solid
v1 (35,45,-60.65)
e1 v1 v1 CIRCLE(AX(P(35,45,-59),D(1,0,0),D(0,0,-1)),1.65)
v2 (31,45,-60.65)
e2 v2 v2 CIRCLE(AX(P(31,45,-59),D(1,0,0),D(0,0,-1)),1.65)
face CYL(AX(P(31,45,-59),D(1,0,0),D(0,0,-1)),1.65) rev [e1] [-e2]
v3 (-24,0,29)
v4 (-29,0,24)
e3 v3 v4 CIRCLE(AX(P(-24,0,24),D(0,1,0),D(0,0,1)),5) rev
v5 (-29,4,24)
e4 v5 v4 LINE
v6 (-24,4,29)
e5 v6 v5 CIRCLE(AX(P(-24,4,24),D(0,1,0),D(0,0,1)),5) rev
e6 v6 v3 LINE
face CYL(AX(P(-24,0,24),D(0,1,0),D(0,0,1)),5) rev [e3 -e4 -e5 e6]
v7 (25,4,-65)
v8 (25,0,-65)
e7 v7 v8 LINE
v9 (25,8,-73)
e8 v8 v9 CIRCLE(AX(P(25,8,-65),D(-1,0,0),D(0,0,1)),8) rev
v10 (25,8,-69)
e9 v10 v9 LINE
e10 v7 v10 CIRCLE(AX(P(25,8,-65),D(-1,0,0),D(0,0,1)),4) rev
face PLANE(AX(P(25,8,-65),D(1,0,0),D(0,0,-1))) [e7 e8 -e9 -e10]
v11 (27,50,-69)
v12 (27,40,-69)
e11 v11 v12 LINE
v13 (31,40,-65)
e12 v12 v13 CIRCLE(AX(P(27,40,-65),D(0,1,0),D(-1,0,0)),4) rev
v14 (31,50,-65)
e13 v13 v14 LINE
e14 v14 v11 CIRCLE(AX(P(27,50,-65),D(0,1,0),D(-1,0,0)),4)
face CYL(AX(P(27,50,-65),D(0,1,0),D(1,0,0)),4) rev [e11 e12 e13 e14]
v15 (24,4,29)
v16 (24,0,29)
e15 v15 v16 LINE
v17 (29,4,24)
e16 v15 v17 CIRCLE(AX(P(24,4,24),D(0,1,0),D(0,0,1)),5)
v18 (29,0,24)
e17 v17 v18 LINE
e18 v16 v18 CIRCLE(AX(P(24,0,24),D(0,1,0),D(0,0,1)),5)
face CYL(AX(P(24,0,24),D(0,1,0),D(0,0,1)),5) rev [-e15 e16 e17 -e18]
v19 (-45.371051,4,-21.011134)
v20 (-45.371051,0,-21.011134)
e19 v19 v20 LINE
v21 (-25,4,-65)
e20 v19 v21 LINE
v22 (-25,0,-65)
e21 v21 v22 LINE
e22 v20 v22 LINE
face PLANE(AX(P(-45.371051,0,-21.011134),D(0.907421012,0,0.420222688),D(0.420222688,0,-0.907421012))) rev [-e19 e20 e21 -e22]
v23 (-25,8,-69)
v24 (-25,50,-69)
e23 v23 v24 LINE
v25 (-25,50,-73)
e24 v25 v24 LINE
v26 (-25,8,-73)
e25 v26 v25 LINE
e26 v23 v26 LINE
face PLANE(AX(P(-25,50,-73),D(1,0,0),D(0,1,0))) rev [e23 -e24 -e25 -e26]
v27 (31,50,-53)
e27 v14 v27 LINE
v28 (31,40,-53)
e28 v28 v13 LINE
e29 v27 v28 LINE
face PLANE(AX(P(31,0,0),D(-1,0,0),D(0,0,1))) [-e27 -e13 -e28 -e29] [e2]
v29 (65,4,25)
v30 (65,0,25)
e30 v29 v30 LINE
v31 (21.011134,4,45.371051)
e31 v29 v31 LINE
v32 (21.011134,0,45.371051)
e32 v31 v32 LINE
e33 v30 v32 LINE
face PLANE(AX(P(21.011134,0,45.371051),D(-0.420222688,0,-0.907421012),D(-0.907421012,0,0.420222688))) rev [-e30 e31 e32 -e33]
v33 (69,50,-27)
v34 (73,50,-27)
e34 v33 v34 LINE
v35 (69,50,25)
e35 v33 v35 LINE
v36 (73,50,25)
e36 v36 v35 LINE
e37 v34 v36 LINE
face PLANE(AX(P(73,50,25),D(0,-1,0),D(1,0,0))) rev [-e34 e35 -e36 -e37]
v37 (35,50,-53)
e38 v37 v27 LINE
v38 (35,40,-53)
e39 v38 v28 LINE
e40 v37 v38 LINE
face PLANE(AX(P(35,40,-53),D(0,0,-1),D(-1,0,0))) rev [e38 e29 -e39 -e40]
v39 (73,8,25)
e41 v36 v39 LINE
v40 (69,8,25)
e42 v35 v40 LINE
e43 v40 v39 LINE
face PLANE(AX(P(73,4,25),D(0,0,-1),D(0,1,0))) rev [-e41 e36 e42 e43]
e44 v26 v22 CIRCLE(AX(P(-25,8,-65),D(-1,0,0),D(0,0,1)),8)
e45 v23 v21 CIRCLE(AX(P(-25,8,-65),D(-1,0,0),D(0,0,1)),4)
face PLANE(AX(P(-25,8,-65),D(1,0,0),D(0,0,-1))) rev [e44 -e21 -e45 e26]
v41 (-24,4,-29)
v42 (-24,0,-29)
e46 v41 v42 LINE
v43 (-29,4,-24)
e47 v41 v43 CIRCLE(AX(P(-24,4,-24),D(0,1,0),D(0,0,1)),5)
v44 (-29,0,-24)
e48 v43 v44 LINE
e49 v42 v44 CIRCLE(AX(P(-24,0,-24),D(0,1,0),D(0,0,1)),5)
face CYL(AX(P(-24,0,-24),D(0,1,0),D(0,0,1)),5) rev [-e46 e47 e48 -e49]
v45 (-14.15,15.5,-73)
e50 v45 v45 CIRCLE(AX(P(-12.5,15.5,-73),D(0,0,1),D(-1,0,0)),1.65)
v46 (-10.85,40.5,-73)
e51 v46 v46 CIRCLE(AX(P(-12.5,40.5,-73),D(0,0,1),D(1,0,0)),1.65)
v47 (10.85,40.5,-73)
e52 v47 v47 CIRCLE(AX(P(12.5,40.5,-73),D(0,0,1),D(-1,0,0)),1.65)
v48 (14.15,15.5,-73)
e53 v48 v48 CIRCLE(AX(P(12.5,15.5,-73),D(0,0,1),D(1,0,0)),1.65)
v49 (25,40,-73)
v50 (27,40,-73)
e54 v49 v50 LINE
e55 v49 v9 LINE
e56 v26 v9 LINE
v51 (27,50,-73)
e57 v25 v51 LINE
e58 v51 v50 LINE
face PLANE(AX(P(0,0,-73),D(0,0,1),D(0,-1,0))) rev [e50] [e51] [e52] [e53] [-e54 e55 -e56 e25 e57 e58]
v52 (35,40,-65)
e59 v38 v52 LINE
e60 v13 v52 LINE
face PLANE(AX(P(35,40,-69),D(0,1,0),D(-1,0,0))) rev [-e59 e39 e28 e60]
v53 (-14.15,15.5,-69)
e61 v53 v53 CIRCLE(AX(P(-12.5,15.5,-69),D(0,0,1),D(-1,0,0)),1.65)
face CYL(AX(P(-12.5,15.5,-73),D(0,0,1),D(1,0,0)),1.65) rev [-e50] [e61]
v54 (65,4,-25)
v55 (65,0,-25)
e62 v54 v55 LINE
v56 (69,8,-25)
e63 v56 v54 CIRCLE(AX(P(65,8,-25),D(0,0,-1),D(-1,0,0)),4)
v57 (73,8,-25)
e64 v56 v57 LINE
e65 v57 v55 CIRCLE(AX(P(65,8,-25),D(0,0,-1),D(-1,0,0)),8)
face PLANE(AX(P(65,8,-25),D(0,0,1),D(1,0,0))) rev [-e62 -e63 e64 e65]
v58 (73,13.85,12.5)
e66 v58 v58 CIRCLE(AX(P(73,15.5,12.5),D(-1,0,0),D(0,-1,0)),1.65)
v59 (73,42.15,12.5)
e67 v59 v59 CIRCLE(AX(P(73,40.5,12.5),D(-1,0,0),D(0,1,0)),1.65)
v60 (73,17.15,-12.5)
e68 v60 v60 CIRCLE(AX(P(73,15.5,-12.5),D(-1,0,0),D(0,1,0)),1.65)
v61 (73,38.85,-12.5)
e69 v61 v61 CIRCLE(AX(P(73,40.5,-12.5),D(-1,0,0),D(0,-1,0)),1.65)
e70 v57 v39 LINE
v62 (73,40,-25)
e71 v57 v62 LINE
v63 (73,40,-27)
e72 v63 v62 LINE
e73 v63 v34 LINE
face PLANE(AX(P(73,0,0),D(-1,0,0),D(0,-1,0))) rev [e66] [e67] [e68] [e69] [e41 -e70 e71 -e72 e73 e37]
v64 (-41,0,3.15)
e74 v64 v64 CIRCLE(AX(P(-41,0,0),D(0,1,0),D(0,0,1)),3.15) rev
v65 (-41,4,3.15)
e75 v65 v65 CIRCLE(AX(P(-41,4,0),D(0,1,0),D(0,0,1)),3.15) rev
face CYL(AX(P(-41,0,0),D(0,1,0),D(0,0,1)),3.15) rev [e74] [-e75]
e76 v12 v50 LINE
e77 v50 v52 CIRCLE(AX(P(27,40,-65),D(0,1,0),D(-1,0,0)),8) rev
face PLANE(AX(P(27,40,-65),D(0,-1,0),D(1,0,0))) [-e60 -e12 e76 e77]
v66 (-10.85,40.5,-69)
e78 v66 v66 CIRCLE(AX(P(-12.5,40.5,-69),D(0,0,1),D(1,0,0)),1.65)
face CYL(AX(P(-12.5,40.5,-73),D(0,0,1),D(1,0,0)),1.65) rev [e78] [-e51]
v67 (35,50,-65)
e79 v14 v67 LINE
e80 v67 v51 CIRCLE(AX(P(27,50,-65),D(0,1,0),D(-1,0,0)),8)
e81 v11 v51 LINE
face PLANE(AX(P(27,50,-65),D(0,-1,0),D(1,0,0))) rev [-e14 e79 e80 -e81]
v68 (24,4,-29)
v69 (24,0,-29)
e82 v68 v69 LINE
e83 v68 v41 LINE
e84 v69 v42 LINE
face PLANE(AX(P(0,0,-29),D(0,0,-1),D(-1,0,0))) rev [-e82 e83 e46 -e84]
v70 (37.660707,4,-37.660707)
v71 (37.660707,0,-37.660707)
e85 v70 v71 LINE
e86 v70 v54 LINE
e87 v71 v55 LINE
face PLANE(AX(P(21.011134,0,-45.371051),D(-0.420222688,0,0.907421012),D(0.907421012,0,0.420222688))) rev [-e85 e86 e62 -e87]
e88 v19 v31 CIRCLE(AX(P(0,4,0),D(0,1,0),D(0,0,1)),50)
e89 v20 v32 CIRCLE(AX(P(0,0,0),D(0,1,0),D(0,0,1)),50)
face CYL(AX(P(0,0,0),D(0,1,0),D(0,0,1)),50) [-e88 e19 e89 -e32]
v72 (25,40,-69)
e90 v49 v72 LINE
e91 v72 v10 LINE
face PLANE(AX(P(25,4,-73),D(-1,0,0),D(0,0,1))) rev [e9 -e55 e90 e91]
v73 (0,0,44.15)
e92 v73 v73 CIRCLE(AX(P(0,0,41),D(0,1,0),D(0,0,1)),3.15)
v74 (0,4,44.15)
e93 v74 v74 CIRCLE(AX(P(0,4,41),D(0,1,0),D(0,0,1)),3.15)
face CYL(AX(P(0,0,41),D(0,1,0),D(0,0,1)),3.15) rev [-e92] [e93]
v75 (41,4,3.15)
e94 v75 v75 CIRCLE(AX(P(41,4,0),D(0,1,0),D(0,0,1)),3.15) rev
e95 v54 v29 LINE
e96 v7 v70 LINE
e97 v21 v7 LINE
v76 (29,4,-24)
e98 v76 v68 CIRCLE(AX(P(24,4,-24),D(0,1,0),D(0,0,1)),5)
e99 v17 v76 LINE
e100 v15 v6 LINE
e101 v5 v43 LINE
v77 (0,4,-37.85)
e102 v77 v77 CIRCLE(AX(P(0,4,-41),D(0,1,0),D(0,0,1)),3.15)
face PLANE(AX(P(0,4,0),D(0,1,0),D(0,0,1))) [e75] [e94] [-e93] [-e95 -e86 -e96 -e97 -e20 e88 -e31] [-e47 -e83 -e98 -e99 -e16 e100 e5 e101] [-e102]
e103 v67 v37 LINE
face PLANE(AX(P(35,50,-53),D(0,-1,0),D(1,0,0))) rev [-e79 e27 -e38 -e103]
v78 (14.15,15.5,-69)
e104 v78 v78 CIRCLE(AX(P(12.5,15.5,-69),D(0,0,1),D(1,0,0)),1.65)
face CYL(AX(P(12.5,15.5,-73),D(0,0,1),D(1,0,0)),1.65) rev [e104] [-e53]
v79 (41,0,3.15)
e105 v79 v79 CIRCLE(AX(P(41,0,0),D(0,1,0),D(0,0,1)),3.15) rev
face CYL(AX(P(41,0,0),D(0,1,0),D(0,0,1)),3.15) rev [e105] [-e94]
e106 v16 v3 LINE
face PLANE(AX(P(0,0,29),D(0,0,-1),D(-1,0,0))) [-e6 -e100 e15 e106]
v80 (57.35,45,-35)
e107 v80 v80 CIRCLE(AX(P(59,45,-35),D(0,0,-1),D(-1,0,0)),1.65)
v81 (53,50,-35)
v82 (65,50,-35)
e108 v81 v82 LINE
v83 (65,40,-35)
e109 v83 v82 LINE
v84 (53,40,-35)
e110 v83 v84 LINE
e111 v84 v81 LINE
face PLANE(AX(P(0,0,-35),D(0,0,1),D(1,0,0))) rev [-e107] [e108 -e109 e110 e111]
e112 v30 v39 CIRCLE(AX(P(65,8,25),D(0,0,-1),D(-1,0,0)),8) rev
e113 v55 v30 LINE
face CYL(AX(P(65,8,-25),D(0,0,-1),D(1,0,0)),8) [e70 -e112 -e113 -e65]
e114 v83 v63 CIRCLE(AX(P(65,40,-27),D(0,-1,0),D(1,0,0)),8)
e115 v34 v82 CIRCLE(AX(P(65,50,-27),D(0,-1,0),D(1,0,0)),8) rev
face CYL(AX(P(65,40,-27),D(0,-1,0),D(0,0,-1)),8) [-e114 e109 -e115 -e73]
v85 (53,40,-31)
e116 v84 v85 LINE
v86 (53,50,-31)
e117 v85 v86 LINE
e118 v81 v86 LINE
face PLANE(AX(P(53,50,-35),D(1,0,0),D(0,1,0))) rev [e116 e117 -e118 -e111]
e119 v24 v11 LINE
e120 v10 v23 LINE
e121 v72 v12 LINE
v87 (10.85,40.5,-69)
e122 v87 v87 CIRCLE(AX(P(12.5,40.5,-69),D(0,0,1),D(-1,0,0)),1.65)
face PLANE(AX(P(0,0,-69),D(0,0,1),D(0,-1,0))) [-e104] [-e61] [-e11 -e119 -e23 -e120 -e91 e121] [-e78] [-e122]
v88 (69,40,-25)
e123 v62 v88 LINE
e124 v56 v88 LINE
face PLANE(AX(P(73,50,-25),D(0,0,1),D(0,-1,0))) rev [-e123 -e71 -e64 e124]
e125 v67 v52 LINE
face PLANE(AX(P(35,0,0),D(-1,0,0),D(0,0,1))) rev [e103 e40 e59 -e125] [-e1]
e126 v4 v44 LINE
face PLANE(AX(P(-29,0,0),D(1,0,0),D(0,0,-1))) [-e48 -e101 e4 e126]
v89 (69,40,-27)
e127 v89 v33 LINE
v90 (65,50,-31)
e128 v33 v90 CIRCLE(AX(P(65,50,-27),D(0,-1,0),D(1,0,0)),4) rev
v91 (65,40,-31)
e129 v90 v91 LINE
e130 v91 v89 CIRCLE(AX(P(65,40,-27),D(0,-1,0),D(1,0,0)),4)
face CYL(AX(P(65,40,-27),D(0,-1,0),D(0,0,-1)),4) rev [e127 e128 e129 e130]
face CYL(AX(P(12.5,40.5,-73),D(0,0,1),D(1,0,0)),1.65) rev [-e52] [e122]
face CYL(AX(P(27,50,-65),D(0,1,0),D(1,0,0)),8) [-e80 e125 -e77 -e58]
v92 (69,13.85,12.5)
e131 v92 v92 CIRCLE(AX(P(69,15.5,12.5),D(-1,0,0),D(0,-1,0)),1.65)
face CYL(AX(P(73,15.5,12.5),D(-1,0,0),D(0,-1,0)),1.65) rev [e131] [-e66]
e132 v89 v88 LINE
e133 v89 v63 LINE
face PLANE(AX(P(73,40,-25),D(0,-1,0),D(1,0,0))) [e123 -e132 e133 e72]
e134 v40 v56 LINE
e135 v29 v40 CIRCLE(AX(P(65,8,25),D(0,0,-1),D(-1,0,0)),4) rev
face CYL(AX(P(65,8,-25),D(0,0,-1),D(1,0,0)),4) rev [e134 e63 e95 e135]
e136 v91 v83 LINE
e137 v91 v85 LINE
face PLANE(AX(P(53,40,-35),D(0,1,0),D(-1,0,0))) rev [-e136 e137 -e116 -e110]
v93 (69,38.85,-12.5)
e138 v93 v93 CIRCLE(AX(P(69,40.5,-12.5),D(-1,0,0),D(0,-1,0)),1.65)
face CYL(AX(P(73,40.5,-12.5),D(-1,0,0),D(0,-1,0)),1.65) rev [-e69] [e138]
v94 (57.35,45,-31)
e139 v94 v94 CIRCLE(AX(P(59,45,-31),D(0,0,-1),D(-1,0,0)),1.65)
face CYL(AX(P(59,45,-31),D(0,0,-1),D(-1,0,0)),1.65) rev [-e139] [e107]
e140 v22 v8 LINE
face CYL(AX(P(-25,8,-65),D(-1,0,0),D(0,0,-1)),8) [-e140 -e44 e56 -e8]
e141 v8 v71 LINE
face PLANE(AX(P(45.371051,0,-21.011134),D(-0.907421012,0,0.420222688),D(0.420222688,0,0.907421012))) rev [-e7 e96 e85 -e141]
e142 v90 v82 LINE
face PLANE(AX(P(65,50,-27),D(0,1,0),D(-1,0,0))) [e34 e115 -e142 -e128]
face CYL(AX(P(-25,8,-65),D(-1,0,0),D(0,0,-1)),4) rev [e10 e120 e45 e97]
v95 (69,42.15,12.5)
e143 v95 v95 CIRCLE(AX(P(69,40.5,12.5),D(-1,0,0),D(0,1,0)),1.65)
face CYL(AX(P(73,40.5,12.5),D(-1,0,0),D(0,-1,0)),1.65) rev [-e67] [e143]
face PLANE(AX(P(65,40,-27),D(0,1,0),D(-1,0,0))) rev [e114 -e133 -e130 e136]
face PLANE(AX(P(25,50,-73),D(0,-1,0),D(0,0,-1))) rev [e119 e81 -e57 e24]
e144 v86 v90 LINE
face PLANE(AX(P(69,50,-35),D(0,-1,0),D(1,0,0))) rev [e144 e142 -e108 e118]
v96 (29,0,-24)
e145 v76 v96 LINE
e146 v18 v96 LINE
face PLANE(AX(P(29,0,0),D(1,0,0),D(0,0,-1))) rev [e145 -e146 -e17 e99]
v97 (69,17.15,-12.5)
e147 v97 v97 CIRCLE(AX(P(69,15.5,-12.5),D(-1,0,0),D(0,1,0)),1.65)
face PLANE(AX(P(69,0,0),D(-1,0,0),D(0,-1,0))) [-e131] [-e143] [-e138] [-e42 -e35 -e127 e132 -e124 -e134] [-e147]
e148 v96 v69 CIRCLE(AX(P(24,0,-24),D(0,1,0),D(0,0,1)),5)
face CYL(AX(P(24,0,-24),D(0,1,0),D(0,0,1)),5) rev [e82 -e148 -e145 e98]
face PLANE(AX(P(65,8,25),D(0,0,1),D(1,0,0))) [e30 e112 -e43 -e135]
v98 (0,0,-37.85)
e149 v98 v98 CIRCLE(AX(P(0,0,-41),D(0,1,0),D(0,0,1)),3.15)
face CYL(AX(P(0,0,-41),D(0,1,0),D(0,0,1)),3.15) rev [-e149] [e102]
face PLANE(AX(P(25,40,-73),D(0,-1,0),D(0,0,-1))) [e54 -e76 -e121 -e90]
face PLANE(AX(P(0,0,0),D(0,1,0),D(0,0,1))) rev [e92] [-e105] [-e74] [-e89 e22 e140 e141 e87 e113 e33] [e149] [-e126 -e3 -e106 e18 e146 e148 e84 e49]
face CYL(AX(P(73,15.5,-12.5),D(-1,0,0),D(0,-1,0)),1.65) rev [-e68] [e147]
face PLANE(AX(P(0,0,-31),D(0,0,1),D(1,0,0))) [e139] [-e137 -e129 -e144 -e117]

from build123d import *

# Parameters (mm, degrees)
SKETCH_1_R                         = 3.15
EXTRUDE_1_DEPTH                    = 4
SM_EDGE_FLANGE_1_DEPTH             = 50
SM_EDGE_FLANGE_1_BEND_DEPTH        = 50
SKETCH_25_W                        = 10
SKETCH_25_H                        = 10
EXTRUDE_3_DEPTH                    = 4
SKETCH_23_W                        = 10
SKETCH_23_H                        = 10
EXTRUDE_2_DEPTH                    = 4
SKETCH_21_R                        = 1.65
CUT_EXTRUDE_1_DEPTH                = 149.290255917
SKETCH_22_R                        = 1.65
CUT_EXTRUDE_2_DEPTH                = 149.290255917
SM_EDGE_FLANGE_2_STRIP_W           = 24
SM_EDGE_FLANGE_2_STRIP_H           = 4
SM_EDGE_FLANGE_2_STRIP_CUT_DEPTH   = 10
SM_EDGE_FLANGE_2_STRIP_2_W         = 24
SM_EDGE_FLANGE_2_STRIP_2_H         = 4
SM_EDGE_FLANGE_2_STRIP_CUT_2_DEPTH = 10
SM_EDGE_FLANGE_2_DEPTH             = 10
SM_EDGE_FLANGE_2_BEND_DEPTH        = 10
SKETCH_38_R                        = 1.65
CUT_EXTRUDE_3_DEPTH                = 4
SKETCH_37_R                        = 1.65
CUT_EXTRUDE_4_DEPTH                = 4


# Sheet-metal steps are written as plain solids
with BuildPart() as part:
    # Sketch 1 → 凸台-拉伸1 (new body)
    with BuildSketch(Plane(origin=(0, 0, 0), x_dir=(1, 0, 0), z_dir=(0, 1, 0))):
        with BuildLine():
            Line((-25, 65), (-45.371050591, 21.011134388))
            ThreePointArc((-45.371050591, 21.011134388), (-35.355339059, -35.355339059), (21.011134388, -45.371050591))
            Line((21.011134388, -45.371050591), (65, -25))
            Line((65, -25), (65, 25))
            Line((65, 25), (37.660706721, 37.660706721))
            Line((37.660706721, 37.660706721), (25, 65))
            Line((25, 65), (-25, 65))
        make_face()
        with Locations(Location((0, 41, 0), (0, 0, 270))):
            Circle(SKETCH_1_R, mode=Mode.SUBTRACT)
        with Locations(Location((0, -41, 0), (0, 0, 270))):
            Circle(SKETCH_1_R, mode=Mode.SUBTRACT)
        with Locations(Location((-41, 0, 0), (0, 0, 270))):
            Circle(SKETCH_1_R, mode=Mode.SUBTRACT)
        with BuildLine():
            ThreePointArc((29, -24), (27.535533906, -27.535533906), (24, -29))
            Line((24, -29), (-24, -29))
            ThreePointArc((-24, -29), (-27.535533906, -27.535533906), (-29, -24))
            Line((-29, -24), (-29, 24))
            ThreePointArc((-29, 24), (-27.535533906, 27.535533906), (-24, 29))
            Line((-24, 29), (24, 29))
            ThreePointArc((24, 29), (27.535533906, 27.535533906), (29, 24))
            Line((29, 24), (29, -24))
        make_face(mode=Mode.SUBTRACT)
        with Locations(Location((41, 0, 0), (0, 0, 270))):
            Circle(SKETCH_1_R, mode=Mode.SUBTRACT)
    extrude(amount=EXTRUDE_1_DEPTH)

    # 边线-法兰1 section (across the edge) → 边线-法兰1 (add)
    with BuildSketch(Plane(origin=(69, 4, 25), x_dir=(-1, 0, 0), z_dir=(0, 0, -1))):
        with BuildLine():
            Line((-4, 4), (-4, 46))
            Line((-4, 46), (0, 46))
            Line((0, 46), (0, 4))
            ThreePointArc((0, 4), (1.171572875, 1.171572875), (4, 0))
            Line((4, 0), (4, -4))
            ThreePointArc((4, -4), (-1.656854249, -1.656854249), (-4, 4))
        make_face()
    extrude(amount=SM_EDGE_FLANGE_1_DEPTH)

    # 边线-法兰1 section 2 (across the edge) → 边线-法兰1 bend (add)
    with BuildSketch(Plane(origin=(25, 4, -69), x_dir=(0, 0, 1), z_dir=(-1, 0, 0))):
        with BuildLine():
            Line((-4, 4), (-4, 46))
            Line((-4, 46), (0, 46))
            Line((0, 46), (0, 4))
            ThreePointArc((0, 4), (1.171572875, 1.171572875), (4, 0))
            Line((4, 0), (4, -4))
            ThreePointArc((4, -4), (-1.656854249, -1.656854249), (-4, 4))
        make_face()
    extrude(amount=SM_EDGE_FLANGE_1_BEND_DEPTH)

    # 草图25 → 凸台-拉伸3 (add)
    with BuildSketch(Plane.XY.offset(-69)):
        with Locations((30, 45)):
            Rectangle(SKETCH_25_W, SKETCH_25_H)
    extrude(amount=-EXTRUDE_3_DEPTH)

    # 草图23 → 凸台-拉伸2 (add)
    with BuildSketch(Plane.ZY.offset(-69)):
        with Locations((-30, 45)):
            Rectangle(SKETCH_23_W, SKETCH_23_H)
    extrude(amount=-EXTRUDE_2_DEPTH)

    # 草图21 → 切除-拉伸1 (cut, through all)
    with BuildSketch(Plane.XY.offset(-69)):
        with Locations((-12.5, 40.5)):
            Circle(SKETCH_21_R)
        with Locations(Location((12.5, 40.5, 0), (0, 0, 180))):
            Circle(SKETCH_21_R)
        with Locations((12.5, 15.5)):
            Circle(SKETCH_21_R)
        with Locations(Location((-12.5, 15.5, 0), (0, 0, 180))):
            Circle(SKETCH_21_R)
    extrude(amount=-CUT_EXTRUDE_1_DEPTH, mode=Mode.SUBTRACT)

    # 草图22 → 切除-拉伸2 (cut, through all)
    with BuildSketch(Plane.ZY.offset(-69)):
        with Locations(Location((-12.5, 40.5, 0), (0, 0, 270))):
            Circle(SKETCH_22_R)
        with Locations(Location((12.5, 40.5, 0), (0, 0, 90))):
            Circle(SKETCH_22_R)
        with Locations(Location((12.5, 15.5, 0), (0, 0, 270))):
            Circle(SKETCH_22_R)
        with Locations(Location((-12.5, 15.5, 0), (0, 0, 90))):
            Circle(SKETCH_22_R)
    extrude(amount=-CUT_EXTRUDE_2_DEPTH, mode=Mode.SUBTRACT)

    # 边线-法兰2 strip (across the edge) → 边线-法兰2 strip cut (cut)
    with BuildSketch(Plane(origin=(69, 50, -35), x_dir=(0, 0, 1), z_dir=(0, -1, 0))):
        with Locations((-4, -2)):
            Rectangle(SM_EDGE_FLANGE_2_STRIP_W, SM_EDGE_FLANGE_2_STRIP_H)
    extrude(amount=SM_EDGE_FLANGE_2_STRIP_CUT_DEPTH, mode=Mode.SUBTRACT)

    # 边线-法兰2 strip 2 (across the edge) → 边线-法兰2 strip cut 2 (cut)
    with BuildSketch(Plane(origin=(35, 40, -69), x_dir=(-1, 0, 0), z_dir=(0, 1, 0))):
        with Locations((-4, -2)):
            Rectangle(SM_EDGE_FLANGE_2_STRIP_2_W, SM_EDGE_FLANGE_2_STRIP_2_H)
    extrude(amount=SM_EDGE_FLANGE_2_STRIP_CUT_2_DEPTH, mode=Mode.SUBTRACT)

    # 边线-法兰2 section (across the edge) → 边线-法兰2 (add)
    with BuildSketch(Plane(origin=(69, 50, -35), x_dir=(0, 0, 1), z_dir=(0, -1, 0))):
        with BuildLine():
            Line((0, 4), (0, 16))
            Line((0, 16), (4, 16))
            Line((4, 16), (4, 4))
            ThreePointArc((4, 4), (5.171572875, 1.171572875), (8, 0))
            Line((8, 0), (8, -4))
            ThreePointArc((8, -4), (2.343145751, -1.656854249), (0, 4))
        make_face()
    extrude(amount=SM_EDGE_FLANGE_2_DEPTH)

    # 边线-法兰2 section 2 (across the edge) → 边线-法兰2 bend (add)
    with BuildSketch(Plane(origin=(35, 40, -69), x_dir=(-1, 0, 0), z_dir=(0, 1, 0))):
        with BuildLine():
            Line((0, 4), (0, 16))
            Line((0, 16), (4, 16))
            Line((4, 16), (4, 4))
            ThreePointArc((4, 4), (5.171572875, 1.171572875), (8, 0))
            Line((8, 0), (8, -4))
            ThreePointArc((8, -4), (2.343145751, -1.656854249), (0, 4))
        make_face()
    extrude(amount=SM_EDGE_FLANGE_2_BEND_DEPTH)

    # 草图38 → 切除-拉伸3 (cut)
    with BuildSketch(Plane(origin=(0, 0, -35), x_dir=(-1, 0, 0), z_dir=(0, 0, -1))):
        with Locations((-59, 45)):
            Circle(SKETCH_38_R)
    extrude(amount=-CUT_EXTRUDE_3_DEPTH, mode=Mode.SUBTRACT)

    # 草图37 → 切除-拉伸4 (cut)
    with BuildSketch(Plane(origin=(35, 0, 0), x_dir=(0, 0, -1), z_dir=(1, 0, 0))):
        with Locations((59, 45)):
            Circle(SKETCH_37_R)
    extrude(amount=-CUT_EXTRUDE_4_DEPTH, mode=Mode.SUBTRACT)


solid = part.part
